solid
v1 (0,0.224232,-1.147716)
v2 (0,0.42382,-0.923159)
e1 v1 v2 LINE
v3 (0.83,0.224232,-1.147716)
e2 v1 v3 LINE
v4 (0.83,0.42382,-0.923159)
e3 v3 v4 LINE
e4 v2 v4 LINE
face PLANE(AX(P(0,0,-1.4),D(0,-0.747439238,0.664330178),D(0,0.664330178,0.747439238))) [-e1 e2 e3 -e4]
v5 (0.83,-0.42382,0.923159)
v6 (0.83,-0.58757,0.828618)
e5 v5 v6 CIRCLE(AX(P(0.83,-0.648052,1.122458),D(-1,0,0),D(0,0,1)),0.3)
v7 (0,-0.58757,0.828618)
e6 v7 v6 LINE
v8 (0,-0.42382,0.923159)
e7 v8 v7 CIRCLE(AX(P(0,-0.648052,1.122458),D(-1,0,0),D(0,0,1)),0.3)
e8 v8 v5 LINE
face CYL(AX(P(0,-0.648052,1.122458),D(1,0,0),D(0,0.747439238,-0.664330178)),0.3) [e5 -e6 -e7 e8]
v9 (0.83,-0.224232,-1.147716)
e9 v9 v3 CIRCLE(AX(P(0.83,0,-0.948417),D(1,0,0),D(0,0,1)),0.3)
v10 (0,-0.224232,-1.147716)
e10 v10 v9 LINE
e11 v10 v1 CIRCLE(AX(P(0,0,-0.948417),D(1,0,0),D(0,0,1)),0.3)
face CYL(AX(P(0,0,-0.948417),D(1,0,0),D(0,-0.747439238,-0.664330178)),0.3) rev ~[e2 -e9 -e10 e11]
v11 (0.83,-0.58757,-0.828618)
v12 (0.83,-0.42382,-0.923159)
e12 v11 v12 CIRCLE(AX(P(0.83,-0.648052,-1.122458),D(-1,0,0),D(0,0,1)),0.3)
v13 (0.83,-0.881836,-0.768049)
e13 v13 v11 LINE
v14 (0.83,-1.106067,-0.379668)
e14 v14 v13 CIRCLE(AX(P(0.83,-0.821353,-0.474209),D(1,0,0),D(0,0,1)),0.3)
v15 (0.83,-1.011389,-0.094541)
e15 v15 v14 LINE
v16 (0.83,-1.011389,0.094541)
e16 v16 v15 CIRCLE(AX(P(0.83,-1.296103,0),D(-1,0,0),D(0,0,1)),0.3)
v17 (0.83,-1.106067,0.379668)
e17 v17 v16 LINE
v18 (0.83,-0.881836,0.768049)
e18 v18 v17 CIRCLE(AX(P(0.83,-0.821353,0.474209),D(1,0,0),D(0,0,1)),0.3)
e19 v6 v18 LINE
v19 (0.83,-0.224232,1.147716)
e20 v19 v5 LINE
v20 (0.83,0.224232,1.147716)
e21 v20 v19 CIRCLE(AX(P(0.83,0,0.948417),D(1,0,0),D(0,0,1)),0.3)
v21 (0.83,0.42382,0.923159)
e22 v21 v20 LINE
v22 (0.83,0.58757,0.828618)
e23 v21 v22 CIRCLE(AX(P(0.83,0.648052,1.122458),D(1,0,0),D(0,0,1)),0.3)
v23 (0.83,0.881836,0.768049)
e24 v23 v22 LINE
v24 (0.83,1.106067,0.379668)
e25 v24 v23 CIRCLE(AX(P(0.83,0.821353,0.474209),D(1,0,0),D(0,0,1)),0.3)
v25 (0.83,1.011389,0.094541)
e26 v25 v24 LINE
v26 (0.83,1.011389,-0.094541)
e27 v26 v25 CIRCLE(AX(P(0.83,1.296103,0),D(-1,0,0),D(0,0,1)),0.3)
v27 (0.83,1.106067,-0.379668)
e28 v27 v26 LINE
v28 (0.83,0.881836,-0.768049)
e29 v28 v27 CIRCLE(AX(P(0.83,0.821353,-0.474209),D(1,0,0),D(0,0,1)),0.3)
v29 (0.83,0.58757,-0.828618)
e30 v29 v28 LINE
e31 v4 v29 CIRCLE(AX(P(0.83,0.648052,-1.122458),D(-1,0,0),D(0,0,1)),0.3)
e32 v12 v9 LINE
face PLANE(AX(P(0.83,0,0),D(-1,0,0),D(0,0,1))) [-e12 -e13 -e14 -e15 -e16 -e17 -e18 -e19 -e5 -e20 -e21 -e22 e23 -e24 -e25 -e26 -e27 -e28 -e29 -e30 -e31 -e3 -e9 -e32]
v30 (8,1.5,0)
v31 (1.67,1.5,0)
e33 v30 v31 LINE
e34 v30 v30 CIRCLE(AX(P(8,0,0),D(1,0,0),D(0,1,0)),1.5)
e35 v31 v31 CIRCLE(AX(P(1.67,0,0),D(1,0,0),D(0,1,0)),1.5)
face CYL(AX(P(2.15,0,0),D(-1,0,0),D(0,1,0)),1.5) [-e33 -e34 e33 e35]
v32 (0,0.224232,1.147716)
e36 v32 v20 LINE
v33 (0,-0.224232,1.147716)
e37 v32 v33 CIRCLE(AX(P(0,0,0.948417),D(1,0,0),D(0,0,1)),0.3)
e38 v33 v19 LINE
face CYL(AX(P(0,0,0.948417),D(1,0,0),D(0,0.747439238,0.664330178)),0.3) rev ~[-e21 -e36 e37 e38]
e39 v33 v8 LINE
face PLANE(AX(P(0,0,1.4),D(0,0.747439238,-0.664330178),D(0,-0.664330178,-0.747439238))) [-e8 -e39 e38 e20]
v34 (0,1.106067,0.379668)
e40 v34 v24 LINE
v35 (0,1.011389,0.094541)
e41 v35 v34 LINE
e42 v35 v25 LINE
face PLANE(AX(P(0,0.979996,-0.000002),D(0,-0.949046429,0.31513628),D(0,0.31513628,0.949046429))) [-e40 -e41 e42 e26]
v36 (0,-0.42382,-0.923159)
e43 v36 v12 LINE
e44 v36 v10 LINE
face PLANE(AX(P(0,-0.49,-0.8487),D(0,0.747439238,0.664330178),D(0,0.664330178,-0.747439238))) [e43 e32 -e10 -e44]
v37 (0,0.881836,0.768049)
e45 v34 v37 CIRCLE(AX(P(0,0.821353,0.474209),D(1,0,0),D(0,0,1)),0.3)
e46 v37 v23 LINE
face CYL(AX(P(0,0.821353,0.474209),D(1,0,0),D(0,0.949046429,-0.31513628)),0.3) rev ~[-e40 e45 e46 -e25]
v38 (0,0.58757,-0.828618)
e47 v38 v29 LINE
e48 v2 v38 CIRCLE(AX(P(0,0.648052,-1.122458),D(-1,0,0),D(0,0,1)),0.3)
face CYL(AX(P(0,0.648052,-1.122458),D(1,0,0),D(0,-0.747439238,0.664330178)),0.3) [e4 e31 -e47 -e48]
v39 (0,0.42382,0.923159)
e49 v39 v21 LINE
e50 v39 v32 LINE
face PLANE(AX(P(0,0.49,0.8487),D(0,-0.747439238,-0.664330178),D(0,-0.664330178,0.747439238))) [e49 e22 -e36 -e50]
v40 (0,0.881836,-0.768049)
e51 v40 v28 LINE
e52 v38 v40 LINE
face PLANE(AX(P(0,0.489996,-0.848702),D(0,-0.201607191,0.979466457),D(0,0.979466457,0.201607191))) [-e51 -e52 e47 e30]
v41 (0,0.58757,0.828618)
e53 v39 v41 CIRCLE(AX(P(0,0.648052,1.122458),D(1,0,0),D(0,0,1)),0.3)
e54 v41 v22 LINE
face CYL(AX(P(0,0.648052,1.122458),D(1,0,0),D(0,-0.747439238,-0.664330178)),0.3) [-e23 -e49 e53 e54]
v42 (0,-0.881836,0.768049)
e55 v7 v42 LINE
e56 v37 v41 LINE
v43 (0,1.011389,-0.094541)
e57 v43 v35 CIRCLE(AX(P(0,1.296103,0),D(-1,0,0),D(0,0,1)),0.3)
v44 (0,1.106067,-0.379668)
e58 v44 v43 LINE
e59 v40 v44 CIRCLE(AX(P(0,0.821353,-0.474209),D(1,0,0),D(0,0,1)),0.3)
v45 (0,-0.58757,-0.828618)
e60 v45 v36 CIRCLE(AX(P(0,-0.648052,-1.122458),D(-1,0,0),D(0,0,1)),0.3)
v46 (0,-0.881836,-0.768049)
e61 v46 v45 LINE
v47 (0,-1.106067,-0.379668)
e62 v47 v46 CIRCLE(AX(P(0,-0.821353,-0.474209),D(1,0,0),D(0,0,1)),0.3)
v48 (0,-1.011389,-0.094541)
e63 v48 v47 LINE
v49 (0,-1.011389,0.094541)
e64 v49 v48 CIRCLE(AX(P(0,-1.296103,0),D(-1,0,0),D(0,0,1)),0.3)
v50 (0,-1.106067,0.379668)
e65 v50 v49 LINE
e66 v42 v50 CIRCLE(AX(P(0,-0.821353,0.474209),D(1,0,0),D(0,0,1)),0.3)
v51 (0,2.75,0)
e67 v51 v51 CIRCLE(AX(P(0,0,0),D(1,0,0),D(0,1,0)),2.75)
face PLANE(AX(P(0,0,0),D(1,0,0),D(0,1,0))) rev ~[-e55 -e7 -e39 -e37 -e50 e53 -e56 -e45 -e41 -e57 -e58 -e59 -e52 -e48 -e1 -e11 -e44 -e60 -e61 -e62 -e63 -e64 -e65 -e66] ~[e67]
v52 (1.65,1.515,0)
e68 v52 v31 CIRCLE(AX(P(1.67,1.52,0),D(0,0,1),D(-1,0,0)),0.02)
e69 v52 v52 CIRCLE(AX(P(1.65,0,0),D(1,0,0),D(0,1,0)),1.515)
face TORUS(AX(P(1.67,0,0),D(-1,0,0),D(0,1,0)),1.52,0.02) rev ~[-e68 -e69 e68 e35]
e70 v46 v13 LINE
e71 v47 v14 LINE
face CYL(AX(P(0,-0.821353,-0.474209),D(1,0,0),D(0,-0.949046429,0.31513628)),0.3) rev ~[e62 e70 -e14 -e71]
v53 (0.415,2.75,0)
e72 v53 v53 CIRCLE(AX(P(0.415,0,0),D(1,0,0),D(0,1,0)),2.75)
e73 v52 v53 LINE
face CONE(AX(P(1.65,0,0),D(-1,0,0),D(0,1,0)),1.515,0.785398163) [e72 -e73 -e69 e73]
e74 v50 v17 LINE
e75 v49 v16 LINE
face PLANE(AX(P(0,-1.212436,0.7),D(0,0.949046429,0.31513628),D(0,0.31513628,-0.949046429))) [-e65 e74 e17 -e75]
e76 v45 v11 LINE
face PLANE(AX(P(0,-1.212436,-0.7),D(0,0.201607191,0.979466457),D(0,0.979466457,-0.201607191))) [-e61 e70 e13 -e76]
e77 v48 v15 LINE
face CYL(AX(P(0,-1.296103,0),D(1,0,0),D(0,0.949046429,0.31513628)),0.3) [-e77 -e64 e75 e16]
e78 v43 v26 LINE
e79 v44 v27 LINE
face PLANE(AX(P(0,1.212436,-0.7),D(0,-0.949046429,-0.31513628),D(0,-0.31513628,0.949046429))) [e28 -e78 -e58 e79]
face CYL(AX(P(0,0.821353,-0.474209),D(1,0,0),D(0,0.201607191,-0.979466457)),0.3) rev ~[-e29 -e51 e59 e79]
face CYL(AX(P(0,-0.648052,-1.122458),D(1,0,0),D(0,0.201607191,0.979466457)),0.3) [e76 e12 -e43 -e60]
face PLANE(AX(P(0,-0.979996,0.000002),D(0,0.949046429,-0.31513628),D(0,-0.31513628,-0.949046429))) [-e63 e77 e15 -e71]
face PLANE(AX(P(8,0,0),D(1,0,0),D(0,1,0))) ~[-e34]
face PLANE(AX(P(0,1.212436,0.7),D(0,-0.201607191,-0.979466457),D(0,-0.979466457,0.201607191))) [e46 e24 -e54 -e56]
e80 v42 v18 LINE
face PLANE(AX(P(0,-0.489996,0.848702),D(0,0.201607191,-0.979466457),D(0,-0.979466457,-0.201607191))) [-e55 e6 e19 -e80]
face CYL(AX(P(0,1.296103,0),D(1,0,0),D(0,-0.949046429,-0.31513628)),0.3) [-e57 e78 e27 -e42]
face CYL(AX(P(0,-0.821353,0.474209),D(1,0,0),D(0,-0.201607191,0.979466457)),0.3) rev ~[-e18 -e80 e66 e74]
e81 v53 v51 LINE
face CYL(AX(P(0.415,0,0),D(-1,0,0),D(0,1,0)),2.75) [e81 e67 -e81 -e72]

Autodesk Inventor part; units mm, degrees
ref_plane "YZ Plane" through (0, 0, 0) normal (1, 0, 0) x (0, 1, 0)
ref_plane "XZ Plane" through (0, 0, 0) normal (0, 1, 0) x (-1, 0, 0)
ref_plane "XY Plane" through (0, 0, 0) normal (0, 0, 1) x (1, 0, 0)
sketch "Sketch1" plane through (0, 0, 0) normal (0, 0, 1) x (1, 0, 0)
  line L0 (0, 0) -> (8, 0)
  line L1 (8, 0) -> (8, 1.5)
  line L2 (8, 1.5) -> (2.35, 1.5)
  line L3 (2.35, 1.5) -> (2.15, 1.5)
  line L4 (2.15, 1.5) -> (1.67, 1.5)
  line L5 (1.65, 1.515) -> (1.65, 1.515)
  line L6 (1.65, 1.515) -> (0.415, 2.75)
  line L7 (0.415, 2.75) -> (0, 2.75)
  line L8 (0, 2.75) -> (0, 0)
  line L9 (1.65, 1.515) -> (1.65, 1.52)
  arc A0 (1.65, 1.52) -> (1.67, 1.5) centre (1.67, 1.52) ccw
  dimension "d17" = 8
  dimension "d18" = 0.415
  dimension "d19" = 1.65
  dimension "d20" = 0
  dimension "d21" = 5.5
  dimension "d22" = 3
  dimension "d23" = 3
  dimension "d25" = 45
  dimension "d26" = 0.2
  dimension "d28" = 0.02
  dimension "d29" = 5.65
  dimension "d30" = 0.02
  dimension "d52" = 0.7
revolve "Revolution1" add sketch "Sketch1" angle 360 about axis through (0, 0, 0) along (1, 0, 0)
thread "Thread1" size "M3x0.5" class "6g" standard "ISO Metric profile" length 5.65
sketch "Sketch2" plane through (0, 0, 0) normal (-1, 0, 0) x (0, 0, 1)
  circle A0 centre (0, 0) radius 1.4 construction
  circle A1 centre (0, 0) radius 0.98 construction
  line L0 (0, 0) -> (0.8487, 0.49)
  line L1 (0, 0) -> (0.98, 0) construction
  line L2 (0, 0) -> (0.8487, -0.49)
  line L3 (0, 0) -> (0.98, 0) construction
  line L4 (0.8487, 0.49) -> (1.4, 0)
  line L5 (1.4, 0) -> (0.8487, -0.49)
  dimension "d34" = 2.8
  dimension "d35" = 1.96
  dimension "d39" = 30
  dimension "d40" = 330
extrude "Extrusion1" cut sketch "Sketch2" against normal blind 0.83
pattern_circular "Circular Pattern1" count 6 over 360 about axis through (-10, 0, 0) along (1, 0, 0) of "Extrusion1"
fillet "Fillet1" radius 0.3 12 edges at (0.415, 0.49, 0.8487) (0.415, 0, 1.4) (0.415, -0.49, 0.8487) (0.415, -0.98, 0) (0.415, -1.2124, 0.7) (0.415, -1.2124, -0.7) (0.415, -0.49, -0.8487) (0.415, 0, -1.4) (0.415, 0.49, -0.8487) (0.415, 1.2124, -0.7) (0.415, 0.98, 0) (0.415, 1.2124, 0.7)
equation "\"d32\" = b"
equation "\"d34\" = A_"
equation "\"d35\" = 0.7 * A_"
equation "\"d43\" = t"
equation "\"d48\" = v"
equation "\"d17\" = l_"
equation "\"d18\" = 0.5 * t"
equation "\"d19\" = k"
equation "\"d21\" = dk"
equation "\"d22\" = d"
equation "\"d23\" = ds_"
equation "\"d25\" = 0.5 * headAngle"
equation "\"d26\" = x"
equation "\"d28\" = r"
equation "\"d29\" = b"
equation "\"b\" = 5.65"
equation "\"A_\" = 2.8"
equation "\"t\" = 0.83"
equation "\"v\" = 0.3"
equation "\"l_\" = 8"
equation "\"k\" = 1.65"
equation "\"dk\" = 5.5"
equation "\"d\" = 3"
equation "\"ds_\" = 3"
equation "\"headAngle\" = 90deg"
equation "\"x\" = 0.2"
equation "\"r\" = 0.02"
properties part number "Šroub se zápustnou hlavou a šestiramennou drážkou ISO 14581 - M3x8-4.8" material "Ocel, měkká"
